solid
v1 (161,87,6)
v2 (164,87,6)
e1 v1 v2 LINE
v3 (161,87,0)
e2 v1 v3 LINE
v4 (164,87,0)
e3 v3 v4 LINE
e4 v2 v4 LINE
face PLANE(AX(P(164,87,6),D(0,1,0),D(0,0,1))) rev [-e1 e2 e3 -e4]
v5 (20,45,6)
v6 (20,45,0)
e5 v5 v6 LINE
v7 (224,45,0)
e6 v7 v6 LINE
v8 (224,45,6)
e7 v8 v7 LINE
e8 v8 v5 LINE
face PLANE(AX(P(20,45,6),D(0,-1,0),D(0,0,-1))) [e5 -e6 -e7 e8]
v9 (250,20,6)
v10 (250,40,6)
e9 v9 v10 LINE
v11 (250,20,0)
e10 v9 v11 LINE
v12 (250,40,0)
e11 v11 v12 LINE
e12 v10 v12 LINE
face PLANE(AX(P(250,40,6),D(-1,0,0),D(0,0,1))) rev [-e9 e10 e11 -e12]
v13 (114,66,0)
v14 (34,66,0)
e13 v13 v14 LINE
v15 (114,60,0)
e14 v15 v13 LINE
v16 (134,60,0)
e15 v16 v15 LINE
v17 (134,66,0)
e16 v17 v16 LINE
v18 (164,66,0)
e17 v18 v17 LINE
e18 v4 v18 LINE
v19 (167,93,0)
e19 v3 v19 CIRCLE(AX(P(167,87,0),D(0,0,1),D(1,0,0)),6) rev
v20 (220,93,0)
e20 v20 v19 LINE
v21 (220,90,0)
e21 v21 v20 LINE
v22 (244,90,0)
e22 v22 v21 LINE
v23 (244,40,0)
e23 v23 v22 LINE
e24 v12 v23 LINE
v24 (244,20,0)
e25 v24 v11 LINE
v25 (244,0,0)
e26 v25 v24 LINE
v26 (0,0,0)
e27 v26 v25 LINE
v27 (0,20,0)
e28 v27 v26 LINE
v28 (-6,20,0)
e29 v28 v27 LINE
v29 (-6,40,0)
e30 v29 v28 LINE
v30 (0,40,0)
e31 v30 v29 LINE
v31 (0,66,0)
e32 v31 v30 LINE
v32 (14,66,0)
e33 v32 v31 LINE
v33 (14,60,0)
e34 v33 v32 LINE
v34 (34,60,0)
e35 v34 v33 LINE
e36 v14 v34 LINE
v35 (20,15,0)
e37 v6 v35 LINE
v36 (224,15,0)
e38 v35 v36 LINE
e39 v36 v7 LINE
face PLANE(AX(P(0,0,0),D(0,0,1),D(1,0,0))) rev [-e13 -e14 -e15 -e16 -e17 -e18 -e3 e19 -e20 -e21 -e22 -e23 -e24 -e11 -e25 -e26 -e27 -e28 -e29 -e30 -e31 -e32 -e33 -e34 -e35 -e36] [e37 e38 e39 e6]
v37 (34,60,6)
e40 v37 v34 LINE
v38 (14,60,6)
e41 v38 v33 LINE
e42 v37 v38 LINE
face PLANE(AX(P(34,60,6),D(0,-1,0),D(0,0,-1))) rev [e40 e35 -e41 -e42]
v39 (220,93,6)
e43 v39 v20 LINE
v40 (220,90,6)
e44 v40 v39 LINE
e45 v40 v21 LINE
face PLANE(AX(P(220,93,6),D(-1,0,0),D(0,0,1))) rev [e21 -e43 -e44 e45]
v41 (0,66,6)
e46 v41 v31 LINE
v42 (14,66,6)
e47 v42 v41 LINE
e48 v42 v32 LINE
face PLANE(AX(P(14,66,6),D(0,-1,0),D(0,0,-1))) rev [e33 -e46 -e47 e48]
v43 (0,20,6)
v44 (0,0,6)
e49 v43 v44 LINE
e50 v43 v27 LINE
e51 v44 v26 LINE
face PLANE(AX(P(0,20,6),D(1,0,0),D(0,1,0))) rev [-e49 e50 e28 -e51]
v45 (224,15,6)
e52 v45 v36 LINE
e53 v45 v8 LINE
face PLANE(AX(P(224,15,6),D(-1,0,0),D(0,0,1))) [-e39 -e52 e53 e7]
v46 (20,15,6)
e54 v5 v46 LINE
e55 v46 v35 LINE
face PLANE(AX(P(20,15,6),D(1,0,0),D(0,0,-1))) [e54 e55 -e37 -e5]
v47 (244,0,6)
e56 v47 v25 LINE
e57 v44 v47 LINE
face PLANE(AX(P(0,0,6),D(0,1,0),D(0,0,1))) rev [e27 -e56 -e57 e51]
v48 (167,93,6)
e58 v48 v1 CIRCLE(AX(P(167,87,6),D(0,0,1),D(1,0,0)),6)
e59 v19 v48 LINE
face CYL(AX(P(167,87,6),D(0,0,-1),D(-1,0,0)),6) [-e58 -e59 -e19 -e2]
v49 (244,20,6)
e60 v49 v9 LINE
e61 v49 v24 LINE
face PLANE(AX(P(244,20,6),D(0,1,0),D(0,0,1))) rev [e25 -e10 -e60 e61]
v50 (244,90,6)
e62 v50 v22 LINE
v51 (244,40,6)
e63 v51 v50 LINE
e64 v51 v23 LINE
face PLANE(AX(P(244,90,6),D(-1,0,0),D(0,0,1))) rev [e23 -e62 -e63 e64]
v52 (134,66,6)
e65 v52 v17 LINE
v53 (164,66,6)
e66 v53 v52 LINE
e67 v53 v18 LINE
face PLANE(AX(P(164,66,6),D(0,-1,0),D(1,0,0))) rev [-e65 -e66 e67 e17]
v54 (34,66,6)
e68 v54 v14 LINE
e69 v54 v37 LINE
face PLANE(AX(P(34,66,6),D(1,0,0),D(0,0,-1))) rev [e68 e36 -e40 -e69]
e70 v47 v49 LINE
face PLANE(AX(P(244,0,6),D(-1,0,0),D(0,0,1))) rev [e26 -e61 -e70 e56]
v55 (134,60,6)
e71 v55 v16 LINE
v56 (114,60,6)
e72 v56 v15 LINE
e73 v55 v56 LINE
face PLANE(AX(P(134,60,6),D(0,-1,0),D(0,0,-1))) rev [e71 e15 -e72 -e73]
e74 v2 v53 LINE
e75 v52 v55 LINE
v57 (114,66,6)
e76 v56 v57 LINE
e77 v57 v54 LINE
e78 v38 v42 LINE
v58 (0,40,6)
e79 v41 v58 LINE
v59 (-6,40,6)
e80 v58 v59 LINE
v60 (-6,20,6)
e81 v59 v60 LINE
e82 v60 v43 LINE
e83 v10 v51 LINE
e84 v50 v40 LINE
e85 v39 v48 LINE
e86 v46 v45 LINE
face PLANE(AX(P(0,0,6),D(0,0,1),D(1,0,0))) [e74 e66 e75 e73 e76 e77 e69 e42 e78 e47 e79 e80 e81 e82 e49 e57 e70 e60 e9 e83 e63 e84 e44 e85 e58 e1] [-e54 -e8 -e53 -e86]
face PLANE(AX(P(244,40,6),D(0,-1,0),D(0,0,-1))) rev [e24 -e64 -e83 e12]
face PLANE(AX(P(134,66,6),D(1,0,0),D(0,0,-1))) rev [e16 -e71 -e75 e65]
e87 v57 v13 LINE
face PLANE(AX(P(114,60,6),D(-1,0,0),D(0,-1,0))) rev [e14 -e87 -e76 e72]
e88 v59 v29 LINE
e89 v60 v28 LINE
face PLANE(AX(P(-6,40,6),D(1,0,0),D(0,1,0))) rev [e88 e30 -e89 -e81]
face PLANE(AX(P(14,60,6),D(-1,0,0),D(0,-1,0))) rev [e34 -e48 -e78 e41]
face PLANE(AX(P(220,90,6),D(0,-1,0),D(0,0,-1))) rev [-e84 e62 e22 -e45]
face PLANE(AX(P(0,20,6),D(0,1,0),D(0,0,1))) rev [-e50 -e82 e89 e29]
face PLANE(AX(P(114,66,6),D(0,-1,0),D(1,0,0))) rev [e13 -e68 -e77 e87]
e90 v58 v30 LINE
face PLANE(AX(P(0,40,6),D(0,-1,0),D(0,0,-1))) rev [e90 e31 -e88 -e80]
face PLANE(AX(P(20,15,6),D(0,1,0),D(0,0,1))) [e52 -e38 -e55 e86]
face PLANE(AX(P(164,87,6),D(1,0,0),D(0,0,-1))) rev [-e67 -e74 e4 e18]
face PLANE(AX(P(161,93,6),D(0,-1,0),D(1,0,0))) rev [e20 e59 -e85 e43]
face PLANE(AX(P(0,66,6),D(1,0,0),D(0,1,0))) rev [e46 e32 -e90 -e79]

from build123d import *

# Parameters (mm, degrees)
SKETCH_1_W      = 204
SKETCH_1_H      = 30
EXTRUDE_1_DEPTH = 6
FILLET_2_R      = 6


with BuildPart() as part:
    # Эскиз1 → Бобышка-Вытянуть1 (new body)
    with BuildSketch(Plane.XY):
        Polygon((0, 20), (0, 0), (244, 0), (244, 20), (250, 20), (250, 40), (244, 40), (244, 90), (220, 90), (220, 93), (161, 93), (161, 87), (164, 87), (164, 66), (134, 66), (134, 60), (114, 60), (114, 66), (34, 66), (34, 60), (14, 60), (14, 66), (0, 66), (0, 40), (-6, 40), (-6, 20), align=None)
        with Locations((122, 30)):
            Rectangle(SKETCH_1_W, SKETCH_1_H, mode=Mode.SUBTRACT)
    extrude(amount=EXTRUDE_1_DEPTH)

    # Скругление2
    fillet_2_edges = [part.edges().sort_by_distance(p)[0] for p in [
        (161, 93, 3),
    ]]
    fillet(fillet_2_edges, radius=FILLET_2_R - 0.0001)  # a hair under: the kernel refuses the full size


solid = part.part
